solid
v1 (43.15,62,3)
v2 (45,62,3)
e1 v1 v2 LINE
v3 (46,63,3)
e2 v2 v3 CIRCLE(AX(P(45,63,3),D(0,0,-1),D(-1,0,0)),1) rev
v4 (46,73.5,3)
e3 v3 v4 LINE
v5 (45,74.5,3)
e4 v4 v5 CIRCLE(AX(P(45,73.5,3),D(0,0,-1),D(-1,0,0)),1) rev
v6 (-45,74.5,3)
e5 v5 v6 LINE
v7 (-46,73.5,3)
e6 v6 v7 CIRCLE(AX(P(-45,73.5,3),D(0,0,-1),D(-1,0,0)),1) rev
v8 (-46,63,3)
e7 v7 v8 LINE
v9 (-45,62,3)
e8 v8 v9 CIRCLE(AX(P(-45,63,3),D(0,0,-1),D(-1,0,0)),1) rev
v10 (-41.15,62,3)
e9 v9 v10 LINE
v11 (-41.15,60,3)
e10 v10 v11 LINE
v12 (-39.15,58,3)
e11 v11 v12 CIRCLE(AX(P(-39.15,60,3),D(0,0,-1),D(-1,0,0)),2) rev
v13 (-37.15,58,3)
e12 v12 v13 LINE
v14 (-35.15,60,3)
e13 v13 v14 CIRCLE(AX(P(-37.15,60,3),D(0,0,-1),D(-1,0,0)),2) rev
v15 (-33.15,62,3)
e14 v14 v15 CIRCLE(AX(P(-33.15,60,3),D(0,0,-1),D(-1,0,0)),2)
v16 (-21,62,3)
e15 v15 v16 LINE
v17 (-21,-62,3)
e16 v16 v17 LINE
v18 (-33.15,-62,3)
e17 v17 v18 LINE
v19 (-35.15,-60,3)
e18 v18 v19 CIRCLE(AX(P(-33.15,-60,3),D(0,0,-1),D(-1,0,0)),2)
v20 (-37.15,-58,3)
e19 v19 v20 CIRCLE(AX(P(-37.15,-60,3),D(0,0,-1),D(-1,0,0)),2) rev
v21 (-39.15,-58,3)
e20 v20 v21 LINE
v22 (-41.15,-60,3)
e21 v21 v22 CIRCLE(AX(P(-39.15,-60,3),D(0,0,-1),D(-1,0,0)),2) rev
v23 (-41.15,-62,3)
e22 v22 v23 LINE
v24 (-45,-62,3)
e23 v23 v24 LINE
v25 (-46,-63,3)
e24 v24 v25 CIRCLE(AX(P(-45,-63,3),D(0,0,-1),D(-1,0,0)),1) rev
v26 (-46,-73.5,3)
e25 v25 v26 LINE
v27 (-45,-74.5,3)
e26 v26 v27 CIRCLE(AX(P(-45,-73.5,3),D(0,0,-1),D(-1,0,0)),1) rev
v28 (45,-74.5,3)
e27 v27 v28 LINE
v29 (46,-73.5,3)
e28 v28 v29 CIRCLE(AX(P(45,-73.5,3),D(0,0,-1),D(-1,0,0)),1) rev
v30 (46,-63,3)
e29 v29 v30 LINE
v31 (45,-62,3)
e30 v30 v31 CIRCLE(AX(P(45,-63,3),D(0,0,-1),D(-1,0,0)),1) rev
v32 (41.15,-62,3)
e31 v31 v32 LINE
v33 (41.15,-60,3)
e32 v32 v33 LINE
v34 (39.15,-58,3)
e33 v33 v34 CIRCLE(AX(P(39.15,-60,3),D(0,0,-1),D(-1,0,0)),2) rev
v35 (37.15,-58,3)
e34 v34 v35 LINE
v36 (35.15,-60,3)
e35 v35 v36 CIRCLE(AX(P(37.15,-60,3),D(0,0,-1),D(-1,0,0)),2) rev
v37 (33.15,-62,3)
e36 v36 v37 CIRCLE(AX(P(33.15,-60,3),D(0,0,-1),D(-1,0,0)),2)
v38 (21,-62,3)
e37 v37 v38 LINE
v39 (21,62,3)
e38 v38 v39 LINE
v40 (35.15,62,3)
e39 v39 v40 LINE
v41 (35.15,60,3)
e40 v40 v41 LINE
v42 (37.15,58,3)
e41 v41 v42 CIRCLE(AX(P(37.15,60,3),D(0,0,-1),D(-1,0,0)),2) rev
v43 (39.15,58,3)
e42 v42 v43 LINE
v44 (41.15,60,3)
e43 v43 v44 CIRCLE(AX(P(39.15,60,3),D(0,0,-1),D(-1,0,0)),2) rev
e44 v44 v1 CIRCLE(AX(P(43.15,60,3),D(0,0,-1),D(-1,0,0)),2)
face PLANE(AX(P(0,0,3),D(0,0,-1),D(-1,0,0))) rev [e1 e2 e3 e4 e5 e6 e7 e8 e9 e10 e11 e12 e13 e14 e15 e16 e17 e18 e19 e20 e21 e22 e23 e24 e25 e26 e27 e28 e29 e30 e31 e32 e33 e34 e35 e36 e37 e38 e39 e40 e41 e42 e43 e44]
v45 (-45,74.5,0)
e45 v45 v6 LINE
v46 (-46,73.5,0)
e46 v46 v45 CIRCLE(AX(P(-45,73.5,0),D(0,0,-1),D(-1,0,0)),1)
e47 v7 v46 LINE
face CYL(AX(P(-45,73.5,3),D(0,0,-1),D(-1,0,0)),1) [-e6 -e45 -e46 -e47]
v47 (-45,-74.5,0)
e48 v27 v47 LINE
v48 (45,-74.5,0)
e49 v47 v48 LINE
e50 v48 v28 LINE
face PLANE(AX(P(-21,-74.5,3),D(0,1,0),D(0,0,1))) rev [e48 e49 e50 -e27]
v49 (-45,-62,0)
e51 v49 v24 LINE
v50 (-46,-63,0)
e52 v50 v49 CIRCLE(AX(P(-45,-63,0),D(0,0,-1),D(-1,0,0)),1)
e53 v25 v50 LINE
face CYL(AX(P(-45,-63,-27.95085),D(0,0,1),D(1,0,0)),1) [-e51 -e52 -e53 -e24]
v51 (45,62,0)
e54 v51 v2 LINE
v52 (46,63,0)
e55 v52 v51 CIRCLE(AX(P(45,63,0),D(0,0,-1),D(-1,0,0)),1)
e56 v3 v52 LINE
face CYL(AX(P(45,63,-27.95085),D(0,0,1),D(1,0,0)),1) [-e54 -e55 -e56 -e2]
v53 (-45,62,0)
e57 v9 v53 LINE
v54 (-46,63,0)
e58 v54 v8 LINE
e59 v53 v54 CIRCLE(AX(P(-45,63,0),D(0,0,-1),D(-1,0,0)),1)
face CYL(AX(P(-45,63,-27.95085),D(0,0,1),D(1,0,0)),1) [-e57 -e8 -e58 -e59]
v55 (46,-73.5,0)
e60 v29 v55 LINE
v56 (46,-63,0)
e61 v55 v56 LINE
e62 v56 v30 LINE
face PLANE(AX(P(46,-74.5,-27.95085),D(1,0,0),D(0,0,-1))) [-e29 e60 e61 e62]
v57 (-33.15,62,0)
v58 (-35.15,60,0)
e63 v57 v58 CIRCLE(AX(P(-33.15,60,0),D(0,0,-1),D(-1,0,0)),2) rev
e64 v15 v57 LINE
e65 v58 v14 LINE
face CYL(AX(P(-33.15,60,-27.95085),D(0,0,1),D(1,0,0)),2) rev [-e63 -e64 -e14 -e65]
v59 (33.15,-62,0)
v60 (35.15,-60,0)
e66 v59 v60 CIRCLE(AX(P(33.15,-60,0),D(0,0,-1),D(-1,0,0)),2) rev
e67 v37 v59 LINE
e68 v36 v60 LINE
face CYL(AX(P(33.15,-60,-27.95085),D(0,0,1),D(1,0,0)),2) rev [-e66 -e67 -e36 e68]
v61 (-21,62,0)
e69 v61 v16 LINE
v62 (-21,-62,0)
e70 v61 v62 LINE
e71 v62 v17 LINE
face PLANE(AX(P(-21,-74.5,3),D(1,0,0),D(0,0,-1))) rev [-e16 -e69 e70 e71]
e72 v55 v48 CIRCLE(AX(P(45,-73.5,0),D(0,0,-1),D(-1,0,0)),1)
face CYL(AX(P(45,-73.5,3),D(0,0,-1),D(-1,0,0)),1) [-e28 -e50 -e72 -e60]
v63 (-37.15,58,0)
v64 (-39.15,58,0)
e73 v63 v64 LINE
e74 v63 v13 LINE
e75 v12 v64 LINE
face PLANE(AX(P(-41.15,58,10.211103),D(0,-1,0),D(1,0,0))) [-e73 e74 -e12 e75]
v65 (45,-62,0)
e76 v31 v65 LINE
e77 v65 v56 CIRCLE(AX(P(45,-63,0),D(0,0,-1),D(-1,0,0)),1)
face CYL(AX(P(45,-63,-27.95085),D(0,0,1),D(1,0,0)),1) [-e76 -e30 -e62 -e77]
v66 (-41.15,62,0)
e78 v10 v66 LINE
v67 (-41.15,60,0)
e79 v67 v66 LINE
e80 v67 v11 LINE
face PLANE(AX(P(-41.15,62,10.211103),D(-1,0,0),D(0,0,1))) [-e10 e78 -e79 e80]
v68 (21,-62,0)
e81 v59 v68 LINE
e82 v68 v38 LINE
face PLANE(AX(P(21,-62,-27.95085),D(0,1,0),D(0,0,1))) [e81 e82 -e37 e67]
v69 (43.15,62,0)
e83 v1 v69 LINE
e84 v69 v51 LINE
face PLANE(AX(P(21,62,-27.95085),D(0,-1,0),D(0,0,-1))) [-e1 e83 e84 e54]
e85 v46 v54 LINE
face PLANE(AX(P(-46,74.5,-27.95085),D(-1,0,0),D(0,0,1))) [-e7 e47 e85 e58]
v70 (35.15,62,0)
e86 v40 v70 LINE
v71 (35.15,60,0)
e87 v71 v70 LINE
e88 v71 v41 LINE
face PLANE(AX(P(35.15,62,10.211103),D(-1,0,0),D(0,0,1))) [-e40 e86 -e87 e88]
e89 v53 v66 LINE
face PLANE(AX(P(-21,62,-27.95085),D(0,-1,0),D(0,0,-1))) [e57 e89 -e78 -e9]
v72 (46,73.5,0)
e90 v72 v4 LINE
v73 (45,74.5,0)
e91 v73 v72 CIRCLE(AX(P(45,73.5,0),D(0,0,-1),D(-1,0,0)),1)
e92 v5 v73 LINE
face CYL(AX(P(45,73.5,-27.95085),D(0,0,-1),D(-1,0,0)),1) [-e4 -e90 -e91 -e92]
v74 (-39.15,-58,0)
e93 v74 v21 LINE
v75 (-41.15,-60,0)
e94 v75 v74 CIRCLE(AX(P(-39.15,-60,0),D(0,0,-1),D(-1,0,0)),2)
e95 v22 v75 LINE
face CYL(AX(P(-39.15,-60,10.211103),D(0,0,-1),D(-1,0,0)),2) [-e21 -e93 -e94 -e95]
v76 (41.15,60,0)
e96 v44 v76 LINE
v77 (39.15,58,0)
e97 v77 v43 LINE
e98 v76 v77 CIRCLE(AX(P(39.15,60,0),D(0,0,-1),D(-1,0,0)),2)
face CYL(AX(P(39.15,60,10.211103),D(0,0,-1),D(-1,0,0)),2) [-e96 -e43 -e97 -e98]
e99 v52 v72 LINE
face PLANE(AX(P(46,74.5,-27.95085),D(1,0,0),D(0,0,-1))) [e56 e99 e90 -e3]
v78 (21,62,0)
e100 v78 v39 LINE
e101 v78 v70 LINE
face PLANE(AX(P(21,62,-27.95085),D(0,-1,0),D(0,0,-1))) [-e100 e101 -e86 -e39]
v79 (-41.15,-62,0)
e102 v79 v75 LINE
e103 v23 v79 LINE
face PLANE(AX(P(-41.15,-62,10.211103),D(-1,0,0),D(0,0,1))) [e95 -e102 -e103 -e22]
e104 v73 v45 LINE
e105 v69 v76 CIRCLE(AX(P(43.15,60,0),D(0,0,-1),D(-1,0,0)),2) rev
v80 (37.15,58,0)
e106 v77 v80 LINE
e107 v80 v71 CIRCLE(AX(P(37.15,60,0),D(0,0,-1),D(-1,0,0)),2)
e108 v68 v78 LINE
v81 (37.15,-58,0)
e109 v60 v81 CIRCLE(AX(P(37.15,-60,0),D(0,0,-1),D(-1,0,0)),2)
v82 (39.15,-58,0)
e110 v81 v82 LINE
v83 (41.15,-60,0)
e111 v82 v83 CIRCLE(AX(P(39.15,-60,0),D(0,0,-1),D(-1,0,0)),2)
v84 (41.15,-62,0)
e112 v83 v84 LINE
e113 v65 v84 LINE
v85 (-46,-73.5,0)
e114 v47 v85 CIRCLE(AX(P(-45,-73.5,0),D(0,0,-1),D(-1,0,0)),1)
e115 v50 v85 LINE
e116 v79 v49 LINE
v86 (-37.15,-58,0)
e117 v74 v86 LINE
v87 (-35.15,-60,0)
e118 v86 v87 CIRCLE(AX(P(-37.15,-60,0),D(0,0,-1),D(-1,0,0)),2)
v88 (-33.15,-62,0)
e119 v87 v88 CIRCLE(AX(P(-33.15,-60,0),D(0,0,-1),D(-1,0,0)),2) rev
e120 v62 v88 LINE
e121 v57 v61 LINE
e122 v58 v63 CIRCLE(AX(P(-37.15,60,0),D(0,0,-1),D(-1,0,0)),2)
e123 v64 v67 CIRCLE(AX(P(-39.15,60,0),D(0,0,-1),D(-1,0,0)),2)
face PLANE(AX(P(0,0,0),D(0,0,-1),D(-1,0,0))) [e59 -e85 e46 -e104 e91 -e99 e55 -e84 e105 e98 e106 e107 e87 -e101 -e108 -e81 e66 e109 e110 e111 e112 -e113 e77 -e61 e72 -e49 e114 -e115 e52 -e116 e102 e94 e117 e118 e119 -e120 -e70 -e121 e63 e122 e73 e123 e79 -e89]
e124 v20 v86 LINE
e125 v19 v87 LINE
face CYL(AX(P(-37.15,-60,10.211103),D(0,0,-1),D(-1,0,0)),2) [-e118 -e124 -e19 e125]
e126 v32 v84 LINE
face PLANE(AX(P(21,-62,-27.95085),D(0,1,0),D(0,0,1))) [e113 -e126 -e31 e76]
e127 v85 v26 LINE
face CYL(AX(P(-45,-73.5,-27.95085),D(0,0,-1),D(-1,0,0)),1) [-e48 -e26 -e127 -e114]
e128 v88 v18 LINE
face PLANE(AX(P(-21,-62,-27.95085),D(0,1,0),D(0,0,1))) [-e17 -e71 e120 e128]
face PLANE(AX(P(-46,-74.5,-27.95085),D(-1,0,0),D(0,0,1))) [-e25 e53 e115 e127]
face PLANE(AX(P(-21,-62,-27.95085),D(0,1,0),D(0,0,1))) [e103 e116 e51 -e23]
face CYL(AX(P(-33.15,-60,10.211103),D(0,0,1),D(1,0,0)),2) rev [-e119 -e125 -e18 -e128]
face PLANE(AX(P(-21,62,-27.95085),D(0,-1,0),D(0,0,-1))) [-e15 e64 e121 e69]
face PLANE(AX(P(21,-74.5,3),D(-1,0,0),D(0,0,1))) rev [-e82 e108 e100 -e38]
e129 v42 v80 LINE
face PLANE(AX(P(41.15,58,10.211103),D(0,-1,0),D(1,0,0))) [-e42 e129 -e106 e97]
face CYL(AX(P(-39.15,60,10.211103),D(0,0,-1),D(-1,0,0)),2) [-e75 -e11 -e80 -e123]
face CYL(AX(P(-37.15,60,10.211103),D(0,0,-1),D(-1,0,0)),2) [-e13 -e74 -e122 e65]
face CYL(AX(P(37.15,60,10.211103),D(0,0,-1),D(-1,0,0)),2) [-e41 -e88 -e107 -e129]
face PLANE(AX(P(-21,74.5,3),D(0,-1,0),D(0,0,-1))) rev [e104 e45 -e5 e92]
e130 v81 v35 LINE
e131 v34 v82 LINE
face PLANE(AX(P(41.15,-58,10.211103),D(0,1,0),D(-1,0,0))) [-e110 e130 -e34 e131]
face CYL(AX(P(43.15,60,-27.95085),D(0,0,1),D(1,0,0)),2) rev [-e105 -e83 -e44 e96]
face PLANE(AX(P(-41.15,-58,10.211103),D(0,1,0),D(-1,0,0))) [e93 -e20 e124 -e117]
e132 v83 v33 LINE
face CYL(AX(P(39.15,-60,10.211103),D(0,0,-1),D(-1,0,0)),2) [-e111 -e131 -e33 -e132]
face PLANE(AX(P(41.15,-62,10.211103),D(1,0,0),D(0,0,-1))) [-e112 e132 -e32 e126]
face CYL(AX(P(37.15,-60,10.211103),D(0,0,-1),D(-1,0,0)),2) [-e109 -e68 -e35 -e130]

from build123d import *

# Parameters (mm, degrees)
SKETCH_1_W      = 42
SKETCH_1_H      = 149
EXTRUDE_1_DEPTH = 3
SKETCH_2_W      = 25
SKETCH_2_H      = 12.5
EXTRUDE_2_DEPTH = 3
FILLET_1_R      = 1
SKETCH_3_W      = 6
SKETCH_3_H      = 4
EXTRUDE_3_DEPTH = 3
FILLET_2_R      = 2


with BuildPart() as part:
    # 草图1 → 凸台-拉伸1 (new body)
    with BuildSketch(Plane.XY):
        Rectangle(SKETCH_1_W, SKETCH_1_H)
    extrude(amount=EXTRUDE_1_DEPTH)

    # 草图2 → 凸台-拉伸2 (add)
    with BuildSketch(Plane.XY.offset(3)):
        with Locations((33.5, -68.25)):
            Rectangle(SKETCH_2_W, SKETCH_2_H)
        with Locations((-33.5, -68.25)):
            Rectangle(SKETCH_2_W, SKETCH_2_H)
        with Locations((-33.5, 68.25)):
            Rectangle(SKETCH_2_W, SKETCH_2_H)
        with Locations((33.5, 68.25)):
            Rectangle(SKETCH_2_W, SKETCH_2_H)
    extrude(amount=-EXTRUDE_2_DEPTH)

    # 圆角1
    fillet_1_edges = [part.edges().sort_by_distance(p)[0] for p in [
        (46, -74.5, 1.5),
        (46, -62, 1.5),
        (-46, -62, 1.5),
        (-46, -74.5, 1.5),
        (-46, 74.5, 1.5),
        (-46, 62, 1.5),
        (46, 62, 1.5),
        (46, 74.5, 1.5),
    ]]
    fillet(fillet_1_edges, radius=FILLET_1_R)

    # 草图3 → 凸台-拉伸3 (add)
    with BuildSketch(Plane(origin=(0, 0, 0), x_dir=(-1, 0, 0), z_dir=(0, 0, -1))):
        with Locations((38.15, 60)):
            Rectangle(SKETCH_3_W, SKETCH_3_H)
        with Locations((-38.15, 60)):
            Rectangle(SKETCH_3_W, SKETCH_3_H)
        with Locations((-38.15, -60)):
            Rectangle(SKETCH_3_W, SKETCH_3_H)
        with Locations((38.15, -60)):
            Rectangle(SKETCH_3_W, SKETCH_3_H)
    extrude(amount=-EXTRUDE_3_DEPTH)

    # 圆角2
    fillet_2_edges = [part.edges().sort_by_distance(p)[0] for p in [
        (-41.15, -58, 1.5),
        (-35.15, -58, 1.5),
        (-35.15, -62, 1.5),
        (41.15, -58, 1.5),
        (35.15, -62, 1.5),
        (35.15, -58, 1.5),
        (35.15, 58, 1.5),
        (41.15, 58, 1.5),
        (-35.15, 58, 1.5),
        (-35.15, 62, 1.5),
        (-41.15, 58, 1.5),
        (41.15, 62, 1.5),
    ]]
    fillet(fillet_2_edges, radius=FILLET_2_R - 0.0001)  # a hair under: the kernel refuses the full size


solid = part.part
